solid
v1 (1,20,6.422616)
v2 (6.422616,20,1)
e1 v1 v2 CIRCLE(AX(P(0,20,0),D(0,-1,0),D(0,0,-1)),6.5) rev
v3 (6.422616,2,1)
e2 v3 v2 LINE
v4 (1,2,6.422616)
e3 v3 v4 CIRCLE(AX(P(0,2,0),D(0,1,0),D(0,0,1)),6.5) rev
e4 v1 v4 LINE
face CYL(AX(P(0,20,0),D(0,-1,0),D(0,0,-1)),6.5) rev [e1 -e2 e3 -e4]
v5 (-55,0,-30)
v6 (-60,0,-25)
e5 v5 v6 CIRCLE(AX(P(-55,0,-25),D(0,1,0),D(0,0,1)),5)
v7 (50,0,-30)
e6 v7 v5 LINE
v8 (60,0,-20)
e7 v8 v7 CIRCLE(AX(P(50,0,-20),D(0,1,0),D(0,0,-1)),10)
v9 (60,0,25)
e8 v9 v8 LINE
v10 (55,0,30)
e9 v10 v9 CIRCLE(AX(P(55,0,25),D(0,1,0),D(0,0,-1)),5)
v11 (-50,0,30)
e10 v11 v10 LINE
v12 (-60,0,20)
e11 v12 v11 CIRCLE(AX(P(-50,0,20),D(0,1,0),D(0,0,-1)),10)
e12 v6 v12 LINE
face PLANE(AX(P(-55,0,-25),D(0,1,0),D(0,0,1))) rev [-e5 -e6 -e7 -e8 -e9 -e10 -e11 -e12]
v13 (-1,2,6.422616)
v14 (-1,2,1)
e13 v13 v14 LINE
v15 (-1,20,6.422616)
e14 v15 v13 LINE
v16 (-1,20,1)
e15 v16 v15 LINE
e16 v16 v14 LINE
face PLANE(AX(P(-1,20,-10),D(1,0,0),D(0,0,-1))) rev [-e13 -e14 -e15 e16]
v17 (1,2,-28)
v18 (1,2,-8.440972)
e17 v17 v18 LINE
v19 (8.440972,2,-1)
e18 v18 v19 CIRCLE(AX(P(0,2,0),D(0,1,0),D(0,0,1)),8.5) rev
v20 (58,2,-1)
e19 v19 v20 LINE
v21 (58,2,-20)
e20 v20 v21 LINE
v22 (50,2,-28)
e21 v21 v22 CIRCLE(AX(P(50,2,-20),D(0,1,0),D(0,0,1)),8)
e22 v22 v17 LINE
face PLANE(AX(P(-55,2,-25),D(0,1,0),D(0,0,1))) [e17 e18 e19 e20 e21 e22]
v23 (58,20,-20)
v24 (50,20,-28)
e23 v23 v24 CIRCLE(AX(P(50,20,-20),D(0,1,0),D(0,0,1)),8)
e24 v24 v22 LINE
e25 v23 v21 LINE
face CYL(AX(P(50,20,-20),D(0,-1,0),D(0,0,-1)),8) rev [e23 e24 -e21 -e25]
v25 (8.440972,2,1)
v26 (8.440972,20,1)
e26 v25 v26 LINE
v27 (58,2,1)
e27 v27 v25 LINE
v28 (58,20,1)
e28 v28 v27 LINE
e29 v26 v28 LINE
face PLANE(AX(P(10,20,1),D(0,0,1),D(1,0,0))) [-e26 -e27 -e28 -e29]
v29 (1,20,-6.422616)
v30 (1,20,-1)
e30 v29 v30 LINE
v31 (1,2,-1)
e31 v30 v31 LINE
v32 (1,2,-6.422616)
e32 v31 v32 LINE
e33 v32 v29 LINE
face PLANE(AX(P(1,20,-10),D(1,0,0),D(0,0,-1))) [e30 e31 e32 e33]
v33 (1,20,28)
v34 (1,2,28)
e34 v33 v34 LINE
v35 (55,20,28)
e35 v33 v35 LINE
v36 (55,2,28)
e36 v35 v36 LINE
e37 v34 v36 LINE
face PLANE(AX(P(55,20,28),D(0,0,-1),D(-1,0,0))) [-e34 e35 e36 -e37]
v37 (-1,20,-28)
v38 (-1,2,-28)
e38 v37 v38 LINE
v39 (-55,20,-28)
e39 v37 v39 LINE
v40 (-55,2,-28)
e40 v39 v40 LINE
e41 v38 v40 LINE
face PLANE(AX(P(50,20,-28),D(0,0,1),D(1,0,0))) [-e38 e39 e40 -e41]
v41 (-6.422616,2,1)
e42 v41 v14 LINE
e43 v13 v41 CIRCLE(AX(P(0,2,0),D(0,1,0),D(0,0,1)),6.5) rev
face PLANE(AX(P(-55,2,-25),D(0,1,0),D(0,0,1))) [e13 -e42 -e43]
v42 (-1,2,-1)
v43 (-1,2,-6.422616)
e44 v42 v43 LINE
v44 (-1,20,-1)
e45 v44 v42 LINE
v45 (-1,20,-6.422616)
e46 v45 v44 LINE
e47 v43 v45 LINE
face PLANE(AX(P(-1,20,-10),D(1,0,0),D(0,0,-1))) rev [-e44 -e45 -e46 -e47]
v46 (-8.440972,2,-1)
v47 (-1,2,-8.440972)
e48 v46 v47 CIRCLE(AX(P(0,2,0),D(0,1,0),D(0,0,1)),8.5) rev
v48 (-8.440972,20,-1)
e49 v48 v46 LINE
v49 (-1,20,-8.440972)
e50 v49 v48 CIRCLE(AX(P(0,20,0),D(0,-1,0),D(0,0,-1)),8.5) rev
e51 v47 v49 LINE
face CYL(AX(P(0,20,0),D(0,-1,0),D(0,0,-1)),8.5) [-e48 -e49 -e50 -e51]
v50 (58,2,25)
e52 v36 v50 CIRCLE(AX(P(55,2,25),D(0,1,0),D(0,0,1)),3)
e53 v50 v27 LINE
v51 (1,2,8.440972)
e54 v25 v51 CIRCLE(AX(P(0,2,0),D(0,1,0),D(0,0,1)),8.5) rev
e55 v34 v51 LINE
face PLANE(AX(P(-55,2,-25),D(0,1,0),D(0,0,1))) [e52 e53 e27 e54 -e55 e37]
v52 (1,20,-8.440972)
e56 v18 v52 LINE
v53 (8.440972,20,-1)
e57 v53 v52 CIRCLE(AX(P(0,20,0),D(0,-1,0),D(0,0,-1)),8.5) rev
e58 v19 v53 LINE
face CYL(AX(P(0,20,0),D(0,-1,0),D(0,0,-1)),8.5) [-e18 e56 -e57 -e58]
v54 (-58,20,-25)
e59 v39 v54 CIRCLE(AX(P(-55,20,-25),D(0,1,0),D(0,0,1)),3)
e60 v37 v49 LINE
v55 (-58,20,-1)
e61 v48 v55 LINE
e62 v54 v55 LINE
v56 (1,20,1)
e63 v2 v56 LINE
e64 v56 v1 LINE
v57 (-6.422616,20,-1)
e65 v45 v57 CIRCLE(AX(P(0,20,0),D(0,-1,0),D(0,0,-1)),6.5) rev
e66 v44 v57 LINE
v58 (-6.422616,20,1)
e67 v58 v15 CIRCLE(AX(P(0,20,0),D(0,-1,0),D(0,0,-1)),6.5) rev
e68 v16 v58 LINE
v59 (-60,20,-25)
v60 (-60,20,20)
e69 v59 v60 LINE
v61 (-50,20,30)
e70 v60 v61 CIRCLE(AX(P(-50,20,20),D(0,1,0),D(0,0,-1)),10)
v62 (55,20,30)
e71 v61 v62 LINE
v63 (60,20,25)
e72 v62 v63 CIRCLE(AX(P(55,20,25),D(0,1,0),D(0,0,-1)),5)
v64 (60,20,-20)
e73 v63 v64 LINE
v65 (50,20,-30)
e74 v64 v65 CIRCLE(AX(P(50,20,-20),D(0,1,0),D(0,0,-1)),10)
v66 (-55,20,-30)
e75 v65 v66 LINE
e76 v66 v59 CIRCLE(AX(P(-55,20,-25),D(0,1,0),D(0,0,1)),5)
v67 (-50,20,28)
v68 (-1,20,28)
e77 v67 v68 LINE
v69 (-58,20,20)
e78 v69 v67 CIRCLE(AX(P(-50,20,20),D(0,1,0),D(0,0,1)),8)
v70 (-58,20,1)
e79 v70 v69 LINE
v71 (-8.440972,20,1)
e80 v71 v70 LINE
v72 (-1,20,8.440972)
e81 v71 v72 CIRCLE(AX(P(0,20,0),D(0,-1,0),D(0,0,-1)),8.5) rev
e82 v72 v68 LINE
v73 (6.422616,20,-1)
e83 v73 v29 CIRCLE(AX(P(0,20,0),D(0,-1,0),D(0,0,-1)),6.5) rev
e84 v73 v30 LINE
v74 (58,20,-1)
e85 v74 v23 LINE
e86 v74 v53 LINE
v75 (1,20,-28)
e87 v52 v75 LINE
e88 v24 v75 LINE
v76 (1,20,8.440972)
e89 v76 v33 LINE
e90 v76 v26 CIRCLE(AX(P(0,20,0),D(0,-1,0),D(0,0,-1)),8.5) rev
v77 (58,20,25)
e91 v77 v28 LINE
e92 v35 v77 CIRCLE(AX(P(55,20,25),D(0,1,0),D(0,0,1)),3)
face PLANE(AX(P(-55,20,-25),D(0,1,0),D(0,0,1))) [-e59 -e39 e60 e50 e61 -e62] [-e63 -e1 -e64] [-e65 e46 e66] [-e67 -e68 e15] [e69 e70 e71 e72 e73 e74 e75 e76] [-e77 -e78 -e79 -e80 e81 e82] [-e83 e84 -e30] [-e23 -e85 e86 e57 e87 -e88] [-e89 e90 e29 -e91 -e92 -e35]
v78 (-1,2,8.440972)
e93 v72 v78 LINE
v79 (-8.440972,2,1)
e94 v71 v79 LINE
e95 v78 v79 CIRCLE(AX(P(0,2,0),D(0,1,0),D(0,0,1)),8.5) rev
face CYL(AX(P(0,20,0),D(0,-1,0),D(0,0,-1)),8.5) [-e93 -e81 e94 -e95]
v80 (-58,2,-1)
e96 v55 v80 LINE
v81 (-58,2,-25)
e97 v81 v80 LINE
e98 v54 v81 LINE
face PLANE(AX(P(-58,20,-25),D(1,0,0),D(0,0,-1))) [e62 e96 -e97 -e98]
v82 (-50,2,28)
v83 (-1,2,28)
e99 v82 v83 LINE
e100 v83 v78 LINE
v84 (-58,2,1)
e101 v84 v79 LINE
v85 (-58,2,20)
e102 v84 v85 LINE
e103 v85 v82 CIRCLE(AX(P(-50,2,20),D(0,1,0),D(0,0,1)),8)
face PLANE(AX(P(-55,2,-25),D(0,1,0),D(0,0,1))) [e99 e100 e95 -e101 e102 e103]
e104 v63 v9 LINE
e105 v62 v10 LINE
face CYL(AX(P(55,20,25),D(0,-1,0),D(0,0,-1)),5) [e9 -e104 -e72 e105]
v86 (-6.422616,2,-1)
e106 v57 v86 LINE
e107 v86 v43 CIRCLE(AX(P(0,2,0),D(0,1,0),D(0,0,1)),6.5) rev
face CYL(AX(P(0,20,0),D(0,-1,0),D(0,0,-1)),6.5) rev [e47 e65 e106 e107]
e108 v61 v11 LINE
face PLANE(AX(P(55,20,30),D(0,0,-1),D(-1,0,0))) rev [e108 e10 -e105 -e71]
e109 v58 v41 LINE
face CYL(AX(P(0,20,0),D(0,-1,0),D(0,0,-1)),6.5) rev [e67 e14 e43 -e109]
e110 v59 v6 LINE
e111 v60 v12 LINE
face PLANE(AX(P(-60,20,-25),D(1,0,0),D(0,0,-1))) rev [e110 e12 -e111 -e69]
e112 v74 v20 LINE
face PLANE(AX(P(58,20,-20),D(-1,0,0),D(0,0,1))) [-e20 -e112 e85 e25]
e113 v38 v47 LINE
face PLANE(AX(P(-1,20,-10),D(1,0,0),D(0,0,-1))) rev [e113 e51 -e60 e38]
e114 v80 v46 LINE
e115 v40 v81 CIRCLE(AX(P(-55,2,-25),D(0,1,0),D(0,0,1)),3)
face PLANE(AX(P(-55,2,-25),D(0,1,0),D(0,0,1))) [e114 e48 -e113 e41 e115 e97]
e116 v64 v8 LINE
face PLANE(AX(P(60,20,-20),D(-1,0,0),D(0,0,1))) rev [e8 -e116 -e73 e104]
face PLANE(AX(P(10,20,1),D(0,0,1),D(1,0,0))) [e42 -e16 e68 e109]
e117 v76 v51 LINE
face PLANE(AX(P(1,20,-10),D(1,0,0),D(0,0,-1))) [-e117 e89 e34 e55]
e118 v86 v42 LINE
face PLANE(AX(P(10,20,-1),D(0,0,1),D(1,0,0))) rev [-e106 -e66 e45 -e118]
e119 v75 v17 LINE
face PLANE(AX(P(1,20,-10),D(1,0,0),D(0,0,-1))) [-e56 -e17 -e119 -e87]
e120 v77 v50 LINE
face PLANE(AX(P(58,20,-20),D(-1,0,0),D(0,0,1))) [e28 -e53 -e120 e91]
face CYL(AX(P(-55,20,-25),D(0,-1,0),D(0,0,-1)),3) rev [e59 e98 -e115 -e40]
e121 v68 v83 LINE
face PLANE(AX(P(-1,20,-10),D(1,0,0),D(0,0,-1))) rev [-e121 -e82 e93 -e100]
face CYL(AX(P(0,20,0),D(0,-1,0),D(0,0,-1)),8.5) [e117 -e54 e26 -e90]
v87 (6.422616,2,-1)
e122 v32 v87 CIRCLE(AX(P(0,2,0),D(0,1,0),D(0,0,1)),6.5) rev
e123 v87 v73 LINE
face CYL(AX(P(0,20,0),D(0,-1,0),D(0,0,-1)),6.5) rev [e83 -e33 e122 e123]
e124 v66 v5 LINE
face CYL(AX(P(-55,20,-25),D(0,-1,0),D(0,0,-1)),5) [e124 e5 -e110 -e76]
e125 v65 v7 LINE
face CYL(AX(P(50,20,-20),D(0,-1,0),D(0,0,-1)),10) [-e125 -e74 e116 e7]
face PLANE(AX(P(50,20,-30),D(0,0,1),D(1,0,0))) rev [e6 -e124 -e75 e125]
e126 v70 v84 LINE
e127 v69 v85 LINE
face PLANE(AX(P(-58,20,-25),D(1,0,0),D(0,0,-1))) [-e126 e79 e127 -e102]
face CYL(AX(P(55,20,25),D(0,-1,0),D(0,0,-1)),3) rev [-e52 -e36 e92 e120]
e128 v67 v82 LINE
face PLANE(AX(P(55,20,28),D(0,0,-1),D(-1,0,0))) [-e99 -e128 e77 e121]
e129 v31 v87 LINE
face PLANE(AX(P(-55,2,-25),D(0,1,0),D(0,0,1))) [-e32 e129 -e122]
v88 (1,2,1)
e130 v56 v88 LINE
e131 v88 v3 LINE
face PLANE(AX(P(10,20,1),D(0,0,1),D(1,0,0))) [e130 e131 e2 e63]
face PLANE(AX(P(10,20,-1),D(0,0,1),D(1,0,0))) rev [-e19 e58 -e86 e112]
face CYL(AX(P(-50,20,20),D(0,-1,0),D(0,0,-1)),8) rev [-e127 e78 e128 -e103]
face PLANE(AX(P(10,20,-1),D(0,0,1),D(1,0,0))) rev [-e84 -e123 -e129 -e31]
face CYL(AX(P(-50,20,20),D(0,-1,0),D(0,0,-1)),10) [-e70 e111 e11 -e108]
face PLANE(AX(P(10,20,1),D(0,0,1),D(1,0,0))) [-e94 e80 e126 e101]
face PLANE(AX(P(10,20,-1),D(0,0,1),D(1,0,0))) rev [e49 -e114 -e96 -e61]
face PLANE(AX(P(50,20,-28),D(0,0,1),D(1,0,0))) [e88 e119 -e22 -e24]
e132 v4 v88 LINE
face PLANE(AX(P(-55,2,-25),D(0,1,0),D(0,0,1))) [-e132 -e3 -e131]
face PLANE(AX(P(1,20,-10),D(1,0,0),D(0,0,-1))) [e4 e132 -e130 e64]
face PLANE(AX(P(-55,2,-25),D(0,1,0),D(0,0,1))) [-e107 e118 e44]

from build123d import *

# Parameters (mm, degrees)
BOSS_EXTRUDE1_DEPTH = 20
SHELL1_T            = -2
RIB1_START          = -18
RIB1_DEPTH          = 18


# Read off the part's stored shape, not the designer's step: Rib1
with BuildPart() as part:
    # Sketch1 → Boss-Extrude1 (new body)
    with BuildSketch(Plane(origin=(0, 0, 0), x_dir=(1, 0, 0), z_dir=(0, 1, 0))):
        with BuildLine():
            Line((50, 30), (-55, 30))
            ThreePointArc((-55, 30), (-58.535533906, 28.535533906), (-60, 25))
            Line((-60, 25), (-60, -20))
            ThreePointArc((-60, -20), (-57.071067812, -27.071067812), (-50, -30))
            Line((-50, -30), (55, -30))
            ThreePointArc((55, -30), (58.535533906, -28.535533906), (60, -25))
            Line((60, -25), (60, 20))
            ThreePointArc((60, 20), (57.071067812, 27.071067812), (50, 30))
        make_face()
    extrude(amount=BOSS_EXTRUDE1_DEPTH)

    # Shell1
    shell1_openings = [part.faces().sort_by_distance(p)[0] for p in [
        (0, 20, 0),
    ]]
    offset(amount=SHELL1_T, openings=shell1_openings, kind=Kind.INTERSECTION)

    # Rib1 outline → Rib1 (add)
    with BuildSketch(Plane(origin=(0, 20, 0), x_dir=(1, 0, 0), z_dir=(0, 1, 0)).offset(RIB1_START)):
        with BuildLine():
            ThreePointArc((-1, 8.440971508), (-6.01040764, 6.01040764), (-8.440971508, 1))
            Line((-8.440971508, 1), (-58, 1))
            Line((-58, 1), (-58, -1))
            Line((-58, -1), (-8.440971508, -1))
            ThreePointArc((-8.440971508, -1), (-6.01040764, -6.01040764), (-1, -8.440971508))
            Line((-1, -8.440971508), (-1, -28))
            Line((-1, -28), (1, -28))
            Line((1, -28), (1, -8.440971508))
            ThreePointArc((1, -8.440971508), (6.01040764, -6.01040764), (8.440971508, -1))
            Line((8.440971508, -1), (58, -1))
            Line((58, -1), (58, 1))
            Line((58, 1), (8.440971508, 1))
            ThreePointArc((8.440971508, 1), (6.01040764, 6.01040764), (1, 8.440971508))
            Line((1, 8.440971508), (1, 28))
            Line((1, 28), (-1, 28))
            Line((-1, 28), (-1, 8.440971508))
        make_face()
        with BuildLine():
            Line((-1, -1), (-1, -6.422616289))
            ThreePointArc((-1, -6.422616289), (-4.596194078, -4.596194078), (-6.422616289, -1))
            Line((-6.422616289, -1), (-1, -1))
        make_face(mode=Mode.SUBTRACT)
        with BuildLine():
            Line((1, -1), (6.422616289, -1))
            ThreePointArc((6.422616289, -1), (4.596194078, -4.596194078), (1, -6.422616289))
            Line((1, -6.422616289), (1, -1))
        make_face(mode=Mode.SUBTRACT)
        with BuildLine():
            Line((-1, 1), (-6.422616289, 1))
            ThreePointArc((-6.422616289, 1), (-4.596194078, 4.596194078), (-1, 6.422616289))
            Line((-1, 6.422616289), (-1, 1))
        make_face(mode=Mode.SUBTRACT)
        with BuildLine():
            Line((1, 1), (1, 6.422616289))
            ThreePointArc((1, 6.422616289), (4.596194078, 4.596194078), (6.422616289, 1))
            Line((6.422616289, 1), (1, 1))
        make_face(mode=Mode.SUBTRACT)
    extrude(amount=RIB1_DEPTH)


solid = part.part
